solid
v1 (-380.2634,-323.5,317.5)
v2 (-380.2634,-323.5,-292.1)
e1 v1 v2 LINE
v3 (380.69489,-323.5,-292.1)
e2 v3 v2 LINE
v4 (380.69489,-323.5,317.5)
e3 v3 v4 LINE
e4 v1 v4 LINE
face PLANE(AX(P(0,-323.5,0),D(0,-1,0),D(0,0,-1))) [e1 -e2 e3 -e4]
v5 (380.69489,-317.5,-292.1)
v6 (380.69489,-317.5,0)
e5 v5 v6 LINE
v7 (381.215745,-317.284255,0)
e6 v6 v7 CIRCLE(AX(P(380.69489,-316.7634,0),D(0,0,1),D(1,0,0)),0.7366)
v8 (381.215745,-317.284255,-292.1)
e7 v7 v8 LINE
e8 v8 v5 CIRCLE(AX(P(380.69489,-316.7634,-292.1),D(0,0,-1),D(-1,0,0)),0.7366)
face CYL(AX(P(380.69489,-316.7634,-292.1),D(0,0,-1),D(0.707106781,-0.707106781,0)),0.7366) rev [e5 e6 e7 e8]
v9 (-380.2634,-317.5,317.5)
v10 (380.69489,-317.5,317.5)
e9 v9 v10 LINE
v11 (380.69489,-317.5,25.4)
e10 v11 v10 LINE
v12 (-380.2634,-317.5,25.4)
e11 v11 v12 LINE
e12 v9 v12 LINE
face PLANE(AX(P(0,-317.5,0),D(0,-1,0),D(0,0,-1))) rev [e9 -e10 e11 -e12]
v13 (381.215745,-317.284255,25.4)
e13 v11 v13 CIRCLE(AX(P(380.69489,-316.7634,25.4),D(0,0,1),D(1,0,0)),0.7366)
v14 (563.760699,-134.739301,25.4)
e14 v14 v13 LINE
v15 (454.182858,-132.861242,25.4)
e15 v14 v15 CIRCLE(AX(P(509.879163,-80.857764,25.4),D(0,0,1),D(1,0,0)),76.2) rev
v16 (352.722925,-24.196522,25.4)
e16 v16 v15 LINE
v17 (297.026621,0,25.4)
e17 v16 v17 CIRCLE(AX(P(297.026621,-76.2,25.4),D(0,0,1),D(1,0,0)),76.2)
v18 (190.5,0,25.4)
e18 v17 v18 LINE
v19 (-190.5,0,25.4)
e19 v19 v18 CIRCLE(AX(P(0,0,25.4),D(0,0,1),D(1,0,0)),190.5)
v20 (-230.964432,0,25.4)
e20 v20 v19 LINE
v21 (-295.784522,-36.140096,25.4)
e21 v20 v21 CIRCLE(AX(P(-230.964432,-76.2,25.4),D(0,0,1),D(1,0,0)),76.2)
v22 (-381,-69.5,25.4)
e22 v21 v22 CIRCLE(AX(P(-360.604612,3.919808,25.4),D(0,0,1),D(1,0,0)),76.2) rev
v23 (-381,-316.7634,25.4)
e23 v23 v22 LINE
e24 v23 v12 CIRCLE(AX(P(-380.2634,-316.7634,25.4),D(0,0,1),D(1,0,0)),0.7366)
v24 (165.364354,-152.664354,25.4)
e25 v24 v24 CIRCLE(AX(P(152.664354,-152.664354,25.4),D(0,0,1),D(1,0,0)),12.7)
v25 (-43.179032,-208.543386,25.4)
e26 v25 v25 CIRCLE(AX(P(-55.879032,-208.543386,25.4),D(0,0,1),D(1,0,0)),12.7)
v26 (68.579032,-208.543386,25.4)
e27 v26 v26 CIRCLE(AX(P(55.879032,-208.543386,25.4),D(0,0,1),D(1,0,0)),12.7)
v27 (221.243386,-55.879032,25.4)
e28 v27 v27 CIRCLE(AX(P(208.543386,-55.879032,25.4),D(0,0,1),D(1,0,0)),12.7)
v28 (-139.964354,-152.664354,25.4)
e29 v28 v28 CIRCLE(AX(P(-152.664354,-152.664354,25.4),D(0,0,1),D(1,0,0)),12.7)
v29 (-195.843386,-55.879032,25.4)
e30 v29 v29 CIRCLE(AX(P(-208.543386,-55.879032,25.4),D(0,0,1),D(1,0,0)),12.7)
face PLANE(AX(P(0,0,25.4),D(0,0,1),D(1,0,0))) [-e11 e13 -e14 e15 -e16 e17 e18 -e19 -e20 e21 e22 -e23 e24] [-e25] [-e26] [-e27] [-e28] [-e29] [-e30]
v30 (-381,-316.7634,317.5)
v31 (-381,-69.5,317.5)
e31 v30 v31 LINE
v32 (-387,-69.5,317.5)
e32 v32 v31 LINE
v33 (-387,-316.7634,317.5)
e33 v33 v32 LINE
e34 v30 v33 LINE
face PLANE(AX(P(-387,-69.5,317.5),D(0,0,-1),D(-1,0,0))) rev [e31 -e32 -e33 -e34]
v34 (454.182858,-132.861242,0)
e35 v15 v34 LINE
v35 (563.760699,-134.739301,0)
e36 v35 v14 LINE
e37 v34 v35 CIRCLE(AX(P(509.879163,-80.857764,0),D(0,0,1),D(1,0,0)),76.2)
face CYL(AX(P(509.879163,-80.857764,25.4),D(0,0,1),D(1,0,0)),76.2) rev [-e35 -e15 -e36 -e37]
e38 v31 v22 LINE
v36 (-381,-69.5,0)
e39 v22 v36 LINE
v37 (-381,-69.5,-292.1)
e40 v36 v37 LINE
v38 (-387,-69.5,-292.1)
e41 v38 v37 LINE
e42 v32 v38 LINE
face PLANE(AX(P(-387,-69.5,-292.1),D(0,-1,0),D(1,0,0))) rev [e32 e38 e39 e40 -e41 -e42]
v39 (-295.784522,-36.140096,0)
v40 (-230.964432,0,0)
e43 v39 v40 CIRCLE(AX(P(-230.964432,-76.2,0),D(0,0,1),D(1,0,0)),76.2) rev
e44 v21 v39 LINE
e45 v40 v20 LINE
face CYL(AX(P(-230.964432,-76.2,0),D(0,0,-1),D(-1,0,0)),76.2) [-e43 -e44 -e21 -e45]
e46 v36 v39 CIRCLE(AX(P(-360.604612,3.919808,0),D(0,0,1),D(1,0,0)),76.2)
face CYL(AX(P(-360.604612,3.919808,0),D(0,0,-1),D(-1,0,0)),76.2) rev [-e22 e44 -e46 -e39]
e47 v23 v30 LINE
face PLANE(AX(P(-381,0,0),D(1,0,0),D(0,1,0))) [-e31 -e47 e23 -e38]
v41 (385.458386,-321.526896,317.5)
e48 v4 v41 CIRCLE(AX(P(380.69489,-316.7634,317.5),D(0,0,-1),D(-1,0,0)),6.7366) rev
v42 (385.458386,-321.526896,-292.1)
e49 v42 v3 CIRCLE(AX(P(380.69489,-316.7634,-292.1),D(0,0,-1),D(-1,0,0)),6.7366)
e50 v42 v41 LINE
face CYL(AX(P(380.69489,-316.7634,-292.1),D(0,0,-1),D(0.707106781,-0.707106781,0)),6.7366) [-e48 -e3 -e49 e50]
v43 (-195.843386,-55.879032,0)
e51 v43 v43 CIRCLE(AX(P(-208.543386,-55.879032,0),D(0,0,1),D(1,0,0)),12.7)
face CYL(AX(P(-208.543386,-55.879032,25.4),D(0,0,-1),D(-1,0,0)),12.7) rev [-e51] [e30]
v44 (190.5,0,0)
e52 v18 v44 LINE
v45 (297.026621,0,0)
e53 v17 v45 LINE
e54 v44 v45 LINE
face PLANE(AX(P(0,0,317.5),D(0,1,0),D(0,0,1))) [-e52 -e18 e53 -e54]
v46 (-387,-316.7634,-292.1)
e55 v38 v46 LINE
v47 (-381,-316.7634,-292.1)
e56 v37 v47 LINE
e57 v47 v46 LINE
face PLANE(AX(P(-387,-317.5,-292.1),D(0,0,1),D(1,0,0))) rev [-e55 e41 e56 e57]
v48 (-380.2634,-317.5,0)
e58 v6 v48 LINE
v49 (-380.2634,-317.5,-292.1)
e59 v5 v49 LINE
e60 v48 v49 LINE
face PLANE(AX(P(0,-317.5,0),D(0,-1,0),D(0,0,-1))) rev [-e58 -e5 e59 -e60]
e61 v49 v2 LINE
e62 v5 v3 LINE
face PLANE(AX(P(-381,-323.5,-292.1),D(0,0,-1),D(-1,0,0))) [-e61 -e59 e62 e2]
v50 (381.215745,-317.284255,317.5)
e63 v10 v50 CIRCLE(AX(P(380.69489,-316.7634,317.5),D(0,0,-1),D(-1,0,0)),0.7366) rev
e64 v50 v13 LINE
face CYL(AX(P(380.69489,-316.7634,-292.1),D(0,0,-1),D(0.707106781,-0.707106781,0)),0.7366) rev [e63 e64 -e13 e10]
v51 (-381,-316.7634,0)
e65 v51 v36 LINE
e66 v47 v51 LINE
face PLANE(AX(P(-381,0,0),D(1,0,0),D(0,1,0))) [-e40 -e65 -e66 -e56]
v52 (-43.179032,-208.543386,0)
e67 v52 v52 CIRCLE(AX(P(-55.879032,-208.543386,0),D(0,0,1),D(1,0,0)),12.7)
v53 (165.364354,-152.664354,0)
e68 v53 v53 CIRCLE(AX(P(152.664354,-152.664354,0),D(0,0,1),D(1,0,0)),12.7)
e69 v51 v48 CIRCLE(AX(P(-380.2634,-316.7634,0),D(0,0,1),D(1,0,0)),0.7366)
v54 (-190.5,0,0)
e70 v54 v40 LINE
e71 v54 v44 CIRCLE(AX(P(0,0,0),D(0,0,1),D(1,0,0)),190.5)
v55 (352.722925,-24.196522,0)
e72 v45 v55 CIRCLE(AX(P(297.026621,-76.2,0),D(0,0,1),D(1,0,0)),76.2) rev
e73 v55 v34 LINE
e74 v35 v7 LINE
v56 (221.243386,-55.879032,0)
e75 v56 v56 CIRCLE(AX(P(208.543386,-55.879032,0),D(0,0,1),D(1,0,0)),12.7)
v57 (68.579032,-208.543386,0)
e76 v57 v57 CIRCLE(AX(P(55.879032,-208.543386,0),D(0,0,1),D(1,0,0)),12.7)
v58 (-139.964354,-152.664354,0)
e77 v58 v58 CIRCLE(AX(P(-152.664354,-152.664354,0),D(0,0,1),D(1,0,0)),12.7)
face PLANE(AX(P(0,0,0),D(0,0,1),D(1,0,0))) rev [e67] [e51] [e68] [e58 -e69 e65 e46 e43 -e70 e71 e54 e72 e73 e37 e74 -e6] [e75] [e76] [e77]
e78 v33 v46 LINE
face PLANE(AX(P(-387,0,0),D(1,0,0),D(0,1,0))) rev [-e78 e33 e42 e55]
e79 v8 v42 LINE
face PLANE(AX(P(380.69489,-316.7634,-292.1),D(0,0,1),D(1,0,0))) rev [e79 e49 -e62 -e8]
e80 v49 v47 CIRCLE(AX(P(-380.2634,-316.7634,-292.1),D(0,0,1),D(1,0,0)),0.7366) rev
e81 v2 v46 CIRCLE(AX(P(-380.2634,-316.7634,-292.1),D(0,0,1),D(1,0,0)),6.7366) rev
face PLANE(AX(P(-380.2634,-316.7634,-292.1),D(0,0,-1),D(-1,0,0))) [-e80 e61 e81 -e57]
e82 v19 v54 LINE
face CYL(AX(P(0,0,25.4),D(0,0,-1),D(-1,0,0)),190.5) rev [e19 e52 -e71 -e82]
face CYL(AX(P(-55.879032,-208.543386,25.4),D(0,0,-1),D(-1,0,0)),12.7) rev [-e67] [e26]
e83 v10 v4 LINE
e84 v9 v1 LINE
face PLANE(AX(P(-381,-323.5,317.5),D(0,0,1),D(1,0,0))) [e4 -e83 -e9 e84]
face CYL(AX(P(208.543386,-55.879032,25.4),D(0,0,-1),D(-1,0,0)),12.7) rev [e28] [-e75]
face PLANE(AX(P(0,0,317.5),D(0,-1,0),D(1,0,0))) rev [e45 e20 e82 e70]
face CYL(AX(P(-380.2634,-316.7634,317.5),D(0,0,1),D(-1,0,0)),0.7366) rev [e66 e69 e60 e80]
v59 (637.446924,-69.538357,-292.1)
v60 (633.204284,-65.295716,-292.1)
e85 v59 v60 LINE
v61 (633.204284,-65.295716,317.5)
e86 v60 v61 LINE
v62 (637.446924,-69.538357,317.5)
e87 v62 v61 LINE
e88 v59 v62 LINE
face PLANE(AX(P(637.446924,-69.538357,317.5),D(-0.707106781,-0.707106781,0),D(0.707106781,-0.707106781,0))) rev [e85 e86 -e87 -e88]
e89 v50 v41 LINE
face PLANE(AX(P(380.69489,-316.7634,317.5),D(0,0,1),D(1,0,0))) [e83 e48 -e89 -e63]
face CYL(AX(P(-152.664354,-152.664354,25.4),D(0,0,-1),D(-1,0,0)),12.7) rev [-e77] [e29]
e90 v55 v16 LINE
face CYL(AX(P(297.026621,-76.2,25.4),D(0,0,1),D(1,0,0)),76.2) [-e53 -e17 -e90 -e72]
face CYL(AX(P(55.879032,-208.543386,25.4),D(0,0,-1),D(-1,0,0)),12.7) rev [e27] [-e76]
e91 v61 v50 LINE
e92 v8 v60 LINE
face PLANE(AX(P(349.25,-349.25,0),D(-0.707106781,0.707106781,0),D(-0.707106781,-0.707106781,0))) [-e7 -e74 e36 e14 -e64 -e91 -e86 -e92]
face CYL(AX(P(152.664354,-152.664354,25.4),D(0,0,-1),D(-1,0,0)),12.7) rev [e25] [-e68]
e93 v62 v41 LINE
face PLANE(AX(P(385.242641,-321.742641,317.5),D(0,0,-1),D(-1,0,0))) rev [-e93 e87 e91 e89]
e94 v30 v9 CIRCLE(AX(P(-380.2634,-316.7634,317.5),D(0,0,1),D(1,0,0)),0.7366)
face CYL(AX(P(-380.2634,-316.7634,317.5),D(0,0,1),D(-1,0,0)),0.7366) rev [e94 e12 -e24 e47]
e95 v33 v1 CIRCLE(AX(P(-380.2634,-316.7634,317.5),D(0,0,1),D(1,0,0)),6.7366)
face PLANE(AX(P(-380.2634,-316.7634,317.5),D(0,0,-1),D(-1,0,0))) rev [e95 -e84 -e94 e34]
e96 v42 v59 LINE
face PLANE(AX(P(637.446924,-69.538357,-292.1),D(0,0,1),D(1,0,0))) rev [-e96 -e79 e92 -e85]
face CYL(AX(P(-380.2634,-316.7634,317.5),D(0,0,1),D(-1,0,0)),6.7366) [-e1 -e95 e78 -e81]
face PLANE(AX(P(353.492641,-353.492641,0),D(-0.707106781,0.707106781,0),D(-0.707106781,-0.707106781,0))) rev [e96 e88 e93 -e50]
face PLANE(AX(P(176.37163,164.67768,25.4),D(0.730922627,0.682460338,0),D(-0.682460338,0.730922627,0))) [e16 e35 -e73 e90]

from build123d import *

# Parameters (mm, degrees)
SKETCH1_R                    = 241.3
SKETCH1_R_2                  = 190.5
SKETCH1_R_3                  = 12.7
BOSS_EXTRUDE1_DEPTH          = 25.4
SKETCH19_W                   = 762
SKETCH19_H                   = 609.6
BASE_FLANGE1_DEPTH           = 6
EDGE_FLANGE1_STRIP_CUT_DEPTH = 609.6
EDGE_FLANGE1_DEPTH           = 609.6
EDGE_FLANGE2_STRIP_W         = 25.4732
EDGE_FLANGE2_STRIP_H         = 6
EDGE_FLANGE2_STRIP_CUT_DEPTH = 609.6
EDGE_FLANGE2_DEPTH           = 609.6
BOSS_EXTRUDE2_DEPTH          = 12.7
BOSS_EXTRUDE2_DEPTH_BACK     = 12.7
FILLET1_R                    = 76.2
SKETCH30_R                   = 12.7
CUT_EXTRUDE1_DEPTH           = 783.174585068
FILLET3_R                    = 76.2


# Sheet-metal steps are written as plain solids
with BuildPart() as part:
    # Sketch1 → Boss-Extrude1 (new body)
    with BuildSketch(Plane.XY):
        Circle(SKETCH1_R)
        Circle(SKETCH1_R_2, mode=Mode.SUBTRACT)
        with Locations((55.879031838, 208.543385896)):
            Circle(SKETCH1_R_3, mode=Mode.SUBTRACT)
        with Locations((152.664354058, 152.664354058)):
            Circle(SKETCH1_R_3, mode=Mode.SUBTRACT)
        with Locations((208.543385896, 55.879031838)):
            Circle(SKETCH1_R_3, mode=Mode.SUBTRACT)
        with Locations((208.543385896, -55.879031838)):
            Circle(SKETCH1_R_3, mode=Mode.SUBTRACT)
        with Locations((152.664354058, -152.664354058)):
            Circle(SKETCH1_R_3, mode=Mode.SUBTRACT)
        with Locations((55.879031838, -208.543385896)):
            Circle(SKETCH1_R_3, mode=Mode.SUBTRACT)
        with Locations((-55.879031838, -208.543385896)):
            Circle(SKETCH1_R_3, mode=Mode.SUBTRACT)
        with Locations((-152.664354058, -152.664354058)):
            Circle(SKETCH1_R_3, mode=Mode.SUBTRACT)
        with Locations((-208.543385896, -55.879031838)):
            Circle(SKETCH1_R_3, mode=Mode.SUBTRACT)
        with Locations((-208.543385896, 55.879031838)):
            Circle(SKETCH1_R_3, mode=Mode.SUBTRACT)
        with Locations((-152.664354058, 152.664354058)):
            Circle(SKETCH1_R_3, mode=Mode.SUBTRACT)
        with Locations((-55.879031838, 208.543385896)):
            Circle(SKETCH1_R_3, mode=Mode.SUBTRACT)
    extrude(amount=BOSS_EXTRUDE1_DEPTH)



with BuildPart() as body_2:
    # Sketch19 → Base-Flange1 (new body)
    with BuildSketch(Plane(origin=(0, -317.5, 0), x_dir=(1, 0, 0), z_dir=(0, 1, 0))):
        with Locations((0, -12.7)):
            Rectangle(SKETCH19_W, SKETCH19_H)
    extrude(amount=-BASE_FLANGE1_DEPTH)

    # Edge-Flange1 strip (across the edge) → Edge-Flange1 strip cut (cut)
    with BuildSketch(Plane(origin=(381, -317.5, 317.5), x_dir=(-0.7071067811865438, 0.7071067811865512, 0), z_dir=(0, 0, -1))):
        Polygon((-22.039168001, 13.553886626), (-4.026895542, -4.458385832), (0.215745145, -0.215745145), (-17.796527314, 17.796527314), align=None)
    extrude(amount=EDGE_FLANGE1_STRIP_CUT_DEPTH, mode=Mode.SUBTRACT)

    # Edge-Flange1 section (across the edge) → Edge-Flange1 (add)
    with BuildSketch(Plane(origin=(381, -317.5, 317.5), x_dir=(-0.7071067811865438, 0.7071067811865512, 0), z_dir=(0, 0, -1))):
        with BuildLine():
            Line((-6, 0.30510971), (-6, 356.670718626))
            Line((-6, 356.670718626), (0, 356.670718626))
            Line((0, 356.670718626), (0, 0.30510971))
            ThreePointArc((0, 0.30510971), (0.056070336, 0.023225094), (0.215745145, -0.215745145))
            Line((0.215745145, -0.215745145), (-4.026895542, -4.458385832))
            ThreePointArc((-4.026895542, -4.458385832), (-5.487206859, -2.2728755), (-6, 0.30510971))
        make_face()
    extrude(amount=EDGE_FLANGE1_DEPTH)

    # Edge-Flange2 strip (across the edge) → Edge-Flange2 strip cut (cut)
    with BuildSketch(Plane(origin=(-381, -317.5, -292.1), x_dir=(1, 0, 0), z_dir=(0, 0, 1))):
        with Locations((-12, -3)):
            Rectangle(EDGE_FLANGE2_STRIP_W, EDGE_FLANGE2_STRIP_H)
    extrude(amount=EDGE_FLANGE2_STRIP_CUT_DEPTH, mode=Mode.SUBTRACT)

    # Edge-Flange2 section (across the edge) → Edge-Flange2 (add)
    with BuildSketch(Plane(origin=(-381, -317.5, -292.1), x_dir=(1, 0, 0), z_dir=(0, 0, 1))):
        with BuildLine():
            Line((-6, 0.7366), (-6, 248))
            Line((-6, 248), (0, 248))
            Line((0, 248), (0, 0.7366))
            ThreePointArc((0, 0.7366), (0.215745145, 0.215745145), (0.7366, 0))
            Line((0.7366, 0), (0.7366, -6))
            ThreePointArc((0.7366, -6), (-4.026895542, -4.026895542), (-6, 0.7366))
        make_face()
    extrude(amount=EDGE_FLANGE2_DEPTH)


with BuildPart() as part_1:
    add(part.part)

    add(body_2.part)  # Boss-Extrude2 merges body 2
    # Sketch2 → Boss-Extrude2 (add, two sides: drawn at the far end of the back side and taken through both)
    with BuildSketch(Plane(origin=(0, 0, 12.7), x_dir=(-1, 0, 0), z_dir=(0, 0, -1)).offset(-BOSS_EXTRUDE2_DEPTH_BACK)):
        with BuildLine():
            Line((-176.371629871, 164.677679655), (-508, -190.5))
            Line((-508, -190.5), (-381, -317.5))
            Line((-381, -317.5), (381, -317.5))
            Line((381, -317.5), (381, -190.5))
            Line((381, -190.5), (211.187529283, 116.728391899))
            ThreePointArc((211.187529283, 116.728391899), (-29.628031694, -239.474152547), (-176.371629871, 164.677679655))
        make_face()
    extrude(amount=BOSS_EXTRUDE2_DEPTH + BOSS_EXTRUDE2_DEPTH_BACK)

    # Fillet1
    # the kernel refuses this fillet: 76.2 mm, written as the material it adds along each edge
    with BuildSketch(Plane(origin=(-381, -190.5, 0), x_dir=(0, 1, 0), z_dir=(0, 0, 1))) as fillet1_piece_1:
        with BuildLine():
            CenterArc((194.419807723, -20.395387566), FILLET1_R, 164.475167034, 76.594355804)
            Line((157.558210281, -87.086186287), (156.820978332, -88.420002261))
            Line((156.820978332, -88.420002261), (-0.737231949, -1.333815974))
            Line((-0.737231949, -1.333815974), (0, 1.524))
            ThreePointArc((0, 1.524), (60.5, 1.524), (119.531603846, 0.407907751))
            Line((119.531603846, 0.407907751), (121, 0))
        make_face()
    extrude(amount=25.4)
    with BuildSketch(Plane(origin=(508, -190.5, 25.4), x_dir=(0.7071067811865509, 0.707106781186544, 0), z_dir=(0, 0, -1))) as fillet1_piece_2:
        with BuildLine():
            CenterArc((FILLET1_R * 1.03487581695, -FILLET1_R), FILLET1_R, 90, 91.963796982)
            Line((FILLET1_R * 0.0354631377737, -FILLET1_R * 1.03426801283), (FILLET1_R * 0.0154748841901, -FILLET1_R * 1.03495337309))
            Line((FILLET1_R * 0.0154748841901, -FILLET1_R * 1.03495337309), (-FILLET1_R * 0.020697516339, FILLET1_R * 0.02))
            Line((-FILLET1_R * 0.020697516339, FILLET1_R * 0.02), (FILLET1_R * 1.03487581695, FILLET1_R * 0.02))
            Line((FILLET1_R * 1.03487581695, FILLET1_R * 0.02), (FILLET1_R * 1.03487581695, 0))
        make_face()
    extrude(amount=25.4)

    # Sketch30 → Cut-Extrude1 (cut, through all)
    # profile 1 of 3: a face of its own
    with BuildSketch(Plane(origin=(0, 0, 0), x_dir=(-1, 0, 0), z_dir=(0, 0, -1))):
        with BuildLine():
            Line((-330.130702101, 0), (-241.3, 0))
            ThreePointArc((-241.3, 0), (-224.481808047, 88.507671171), (-176.371629871, 164.677679655))
            Line((-176.371629871, 164.677679655), (-330.130702101, 0))
        make_face()
    # profile 2 of 3: a face of its own
    with BuildSketch(Plane(origin=(0, 0, 0), x_dir=(-1, 0, 0), z_dir=(0, 0, -1))):
        with BuildLine():
            Line((-241.3, 0), (-190.5, 0))
            ThreePointArc((-190.5, 0), (0, 190.5), (190.5, 0))
            Line((190.5, 0), (241.3, 0))
            ThreePointArc((241.3, 0), (233.650637508, 60.274949954), (211.187529283, 116.728391899))
            ThreePointArc((211.187529283, 116.728391899), (29.628031694, 239.474152547), (-176.371629871, 164.677679655))
            ThreePointArc((-176.371629871, 164.677679655), (-224.481808047, 88.507671171), (-241.3, 0))
        make_face()
        with Locations((-208.543385896, 55.879031838)):
            Circle(SKETCH30_R, mode=Mode.SUBTRACT)
        with Locations((-152.664354058, 152.664354058)):
            Circle(SKETCH30_R, mode=Mode.SUBTRACT)
        with Locations((-55.879031838, 208.543385896)):
            Circle(SKETCH30_R, mode=Mode.SUBTRACT)
        with Locations((208.543385896, 55.879031838)):
            Circle(SKETCH30_R, mode=Mode.SUBTRACT)
        with Locations((55.879031838, 208.543385896)):
            Circle(SKETCH30_R, mode=Mode.SUBTRACT)
        with Locations((152.664354058, 152.664354058)):
            Circle(SKETCH30_R, mode=Mode.SUBTRACT)
    # profile 3 of 3: a face of its own
    with BuildSketch(Plane(origin=(0, 0, 0), x_dir=(-1, 0, 0), z_dir=(0, 0, -1))):
        with BuildLine():
            ThreePointArc((211.187529283, 116.728391899), (233.650637508, 60.274949954), (241.3, 0))
            Line((241.3, 0), (275.706099682, 0))
            Line((275.706099682, 0), (211.187529283, 116.728391899))
        make_face()
    extrude(amount=-CUT_EXTRUDE1_DEPTH, mode=Mode.SUBTRACT)

    # Fillet3
    fillet3_edges = [part_1.edges().sort_by_distance(p)[0] for p in [
        (-275.706099682, 0, 12.7),
        (330.130702101, 0, 12.7),
    ]]
    fillet(fillet3_edges, radius=FILLET3_R)


solid = part_1.part
